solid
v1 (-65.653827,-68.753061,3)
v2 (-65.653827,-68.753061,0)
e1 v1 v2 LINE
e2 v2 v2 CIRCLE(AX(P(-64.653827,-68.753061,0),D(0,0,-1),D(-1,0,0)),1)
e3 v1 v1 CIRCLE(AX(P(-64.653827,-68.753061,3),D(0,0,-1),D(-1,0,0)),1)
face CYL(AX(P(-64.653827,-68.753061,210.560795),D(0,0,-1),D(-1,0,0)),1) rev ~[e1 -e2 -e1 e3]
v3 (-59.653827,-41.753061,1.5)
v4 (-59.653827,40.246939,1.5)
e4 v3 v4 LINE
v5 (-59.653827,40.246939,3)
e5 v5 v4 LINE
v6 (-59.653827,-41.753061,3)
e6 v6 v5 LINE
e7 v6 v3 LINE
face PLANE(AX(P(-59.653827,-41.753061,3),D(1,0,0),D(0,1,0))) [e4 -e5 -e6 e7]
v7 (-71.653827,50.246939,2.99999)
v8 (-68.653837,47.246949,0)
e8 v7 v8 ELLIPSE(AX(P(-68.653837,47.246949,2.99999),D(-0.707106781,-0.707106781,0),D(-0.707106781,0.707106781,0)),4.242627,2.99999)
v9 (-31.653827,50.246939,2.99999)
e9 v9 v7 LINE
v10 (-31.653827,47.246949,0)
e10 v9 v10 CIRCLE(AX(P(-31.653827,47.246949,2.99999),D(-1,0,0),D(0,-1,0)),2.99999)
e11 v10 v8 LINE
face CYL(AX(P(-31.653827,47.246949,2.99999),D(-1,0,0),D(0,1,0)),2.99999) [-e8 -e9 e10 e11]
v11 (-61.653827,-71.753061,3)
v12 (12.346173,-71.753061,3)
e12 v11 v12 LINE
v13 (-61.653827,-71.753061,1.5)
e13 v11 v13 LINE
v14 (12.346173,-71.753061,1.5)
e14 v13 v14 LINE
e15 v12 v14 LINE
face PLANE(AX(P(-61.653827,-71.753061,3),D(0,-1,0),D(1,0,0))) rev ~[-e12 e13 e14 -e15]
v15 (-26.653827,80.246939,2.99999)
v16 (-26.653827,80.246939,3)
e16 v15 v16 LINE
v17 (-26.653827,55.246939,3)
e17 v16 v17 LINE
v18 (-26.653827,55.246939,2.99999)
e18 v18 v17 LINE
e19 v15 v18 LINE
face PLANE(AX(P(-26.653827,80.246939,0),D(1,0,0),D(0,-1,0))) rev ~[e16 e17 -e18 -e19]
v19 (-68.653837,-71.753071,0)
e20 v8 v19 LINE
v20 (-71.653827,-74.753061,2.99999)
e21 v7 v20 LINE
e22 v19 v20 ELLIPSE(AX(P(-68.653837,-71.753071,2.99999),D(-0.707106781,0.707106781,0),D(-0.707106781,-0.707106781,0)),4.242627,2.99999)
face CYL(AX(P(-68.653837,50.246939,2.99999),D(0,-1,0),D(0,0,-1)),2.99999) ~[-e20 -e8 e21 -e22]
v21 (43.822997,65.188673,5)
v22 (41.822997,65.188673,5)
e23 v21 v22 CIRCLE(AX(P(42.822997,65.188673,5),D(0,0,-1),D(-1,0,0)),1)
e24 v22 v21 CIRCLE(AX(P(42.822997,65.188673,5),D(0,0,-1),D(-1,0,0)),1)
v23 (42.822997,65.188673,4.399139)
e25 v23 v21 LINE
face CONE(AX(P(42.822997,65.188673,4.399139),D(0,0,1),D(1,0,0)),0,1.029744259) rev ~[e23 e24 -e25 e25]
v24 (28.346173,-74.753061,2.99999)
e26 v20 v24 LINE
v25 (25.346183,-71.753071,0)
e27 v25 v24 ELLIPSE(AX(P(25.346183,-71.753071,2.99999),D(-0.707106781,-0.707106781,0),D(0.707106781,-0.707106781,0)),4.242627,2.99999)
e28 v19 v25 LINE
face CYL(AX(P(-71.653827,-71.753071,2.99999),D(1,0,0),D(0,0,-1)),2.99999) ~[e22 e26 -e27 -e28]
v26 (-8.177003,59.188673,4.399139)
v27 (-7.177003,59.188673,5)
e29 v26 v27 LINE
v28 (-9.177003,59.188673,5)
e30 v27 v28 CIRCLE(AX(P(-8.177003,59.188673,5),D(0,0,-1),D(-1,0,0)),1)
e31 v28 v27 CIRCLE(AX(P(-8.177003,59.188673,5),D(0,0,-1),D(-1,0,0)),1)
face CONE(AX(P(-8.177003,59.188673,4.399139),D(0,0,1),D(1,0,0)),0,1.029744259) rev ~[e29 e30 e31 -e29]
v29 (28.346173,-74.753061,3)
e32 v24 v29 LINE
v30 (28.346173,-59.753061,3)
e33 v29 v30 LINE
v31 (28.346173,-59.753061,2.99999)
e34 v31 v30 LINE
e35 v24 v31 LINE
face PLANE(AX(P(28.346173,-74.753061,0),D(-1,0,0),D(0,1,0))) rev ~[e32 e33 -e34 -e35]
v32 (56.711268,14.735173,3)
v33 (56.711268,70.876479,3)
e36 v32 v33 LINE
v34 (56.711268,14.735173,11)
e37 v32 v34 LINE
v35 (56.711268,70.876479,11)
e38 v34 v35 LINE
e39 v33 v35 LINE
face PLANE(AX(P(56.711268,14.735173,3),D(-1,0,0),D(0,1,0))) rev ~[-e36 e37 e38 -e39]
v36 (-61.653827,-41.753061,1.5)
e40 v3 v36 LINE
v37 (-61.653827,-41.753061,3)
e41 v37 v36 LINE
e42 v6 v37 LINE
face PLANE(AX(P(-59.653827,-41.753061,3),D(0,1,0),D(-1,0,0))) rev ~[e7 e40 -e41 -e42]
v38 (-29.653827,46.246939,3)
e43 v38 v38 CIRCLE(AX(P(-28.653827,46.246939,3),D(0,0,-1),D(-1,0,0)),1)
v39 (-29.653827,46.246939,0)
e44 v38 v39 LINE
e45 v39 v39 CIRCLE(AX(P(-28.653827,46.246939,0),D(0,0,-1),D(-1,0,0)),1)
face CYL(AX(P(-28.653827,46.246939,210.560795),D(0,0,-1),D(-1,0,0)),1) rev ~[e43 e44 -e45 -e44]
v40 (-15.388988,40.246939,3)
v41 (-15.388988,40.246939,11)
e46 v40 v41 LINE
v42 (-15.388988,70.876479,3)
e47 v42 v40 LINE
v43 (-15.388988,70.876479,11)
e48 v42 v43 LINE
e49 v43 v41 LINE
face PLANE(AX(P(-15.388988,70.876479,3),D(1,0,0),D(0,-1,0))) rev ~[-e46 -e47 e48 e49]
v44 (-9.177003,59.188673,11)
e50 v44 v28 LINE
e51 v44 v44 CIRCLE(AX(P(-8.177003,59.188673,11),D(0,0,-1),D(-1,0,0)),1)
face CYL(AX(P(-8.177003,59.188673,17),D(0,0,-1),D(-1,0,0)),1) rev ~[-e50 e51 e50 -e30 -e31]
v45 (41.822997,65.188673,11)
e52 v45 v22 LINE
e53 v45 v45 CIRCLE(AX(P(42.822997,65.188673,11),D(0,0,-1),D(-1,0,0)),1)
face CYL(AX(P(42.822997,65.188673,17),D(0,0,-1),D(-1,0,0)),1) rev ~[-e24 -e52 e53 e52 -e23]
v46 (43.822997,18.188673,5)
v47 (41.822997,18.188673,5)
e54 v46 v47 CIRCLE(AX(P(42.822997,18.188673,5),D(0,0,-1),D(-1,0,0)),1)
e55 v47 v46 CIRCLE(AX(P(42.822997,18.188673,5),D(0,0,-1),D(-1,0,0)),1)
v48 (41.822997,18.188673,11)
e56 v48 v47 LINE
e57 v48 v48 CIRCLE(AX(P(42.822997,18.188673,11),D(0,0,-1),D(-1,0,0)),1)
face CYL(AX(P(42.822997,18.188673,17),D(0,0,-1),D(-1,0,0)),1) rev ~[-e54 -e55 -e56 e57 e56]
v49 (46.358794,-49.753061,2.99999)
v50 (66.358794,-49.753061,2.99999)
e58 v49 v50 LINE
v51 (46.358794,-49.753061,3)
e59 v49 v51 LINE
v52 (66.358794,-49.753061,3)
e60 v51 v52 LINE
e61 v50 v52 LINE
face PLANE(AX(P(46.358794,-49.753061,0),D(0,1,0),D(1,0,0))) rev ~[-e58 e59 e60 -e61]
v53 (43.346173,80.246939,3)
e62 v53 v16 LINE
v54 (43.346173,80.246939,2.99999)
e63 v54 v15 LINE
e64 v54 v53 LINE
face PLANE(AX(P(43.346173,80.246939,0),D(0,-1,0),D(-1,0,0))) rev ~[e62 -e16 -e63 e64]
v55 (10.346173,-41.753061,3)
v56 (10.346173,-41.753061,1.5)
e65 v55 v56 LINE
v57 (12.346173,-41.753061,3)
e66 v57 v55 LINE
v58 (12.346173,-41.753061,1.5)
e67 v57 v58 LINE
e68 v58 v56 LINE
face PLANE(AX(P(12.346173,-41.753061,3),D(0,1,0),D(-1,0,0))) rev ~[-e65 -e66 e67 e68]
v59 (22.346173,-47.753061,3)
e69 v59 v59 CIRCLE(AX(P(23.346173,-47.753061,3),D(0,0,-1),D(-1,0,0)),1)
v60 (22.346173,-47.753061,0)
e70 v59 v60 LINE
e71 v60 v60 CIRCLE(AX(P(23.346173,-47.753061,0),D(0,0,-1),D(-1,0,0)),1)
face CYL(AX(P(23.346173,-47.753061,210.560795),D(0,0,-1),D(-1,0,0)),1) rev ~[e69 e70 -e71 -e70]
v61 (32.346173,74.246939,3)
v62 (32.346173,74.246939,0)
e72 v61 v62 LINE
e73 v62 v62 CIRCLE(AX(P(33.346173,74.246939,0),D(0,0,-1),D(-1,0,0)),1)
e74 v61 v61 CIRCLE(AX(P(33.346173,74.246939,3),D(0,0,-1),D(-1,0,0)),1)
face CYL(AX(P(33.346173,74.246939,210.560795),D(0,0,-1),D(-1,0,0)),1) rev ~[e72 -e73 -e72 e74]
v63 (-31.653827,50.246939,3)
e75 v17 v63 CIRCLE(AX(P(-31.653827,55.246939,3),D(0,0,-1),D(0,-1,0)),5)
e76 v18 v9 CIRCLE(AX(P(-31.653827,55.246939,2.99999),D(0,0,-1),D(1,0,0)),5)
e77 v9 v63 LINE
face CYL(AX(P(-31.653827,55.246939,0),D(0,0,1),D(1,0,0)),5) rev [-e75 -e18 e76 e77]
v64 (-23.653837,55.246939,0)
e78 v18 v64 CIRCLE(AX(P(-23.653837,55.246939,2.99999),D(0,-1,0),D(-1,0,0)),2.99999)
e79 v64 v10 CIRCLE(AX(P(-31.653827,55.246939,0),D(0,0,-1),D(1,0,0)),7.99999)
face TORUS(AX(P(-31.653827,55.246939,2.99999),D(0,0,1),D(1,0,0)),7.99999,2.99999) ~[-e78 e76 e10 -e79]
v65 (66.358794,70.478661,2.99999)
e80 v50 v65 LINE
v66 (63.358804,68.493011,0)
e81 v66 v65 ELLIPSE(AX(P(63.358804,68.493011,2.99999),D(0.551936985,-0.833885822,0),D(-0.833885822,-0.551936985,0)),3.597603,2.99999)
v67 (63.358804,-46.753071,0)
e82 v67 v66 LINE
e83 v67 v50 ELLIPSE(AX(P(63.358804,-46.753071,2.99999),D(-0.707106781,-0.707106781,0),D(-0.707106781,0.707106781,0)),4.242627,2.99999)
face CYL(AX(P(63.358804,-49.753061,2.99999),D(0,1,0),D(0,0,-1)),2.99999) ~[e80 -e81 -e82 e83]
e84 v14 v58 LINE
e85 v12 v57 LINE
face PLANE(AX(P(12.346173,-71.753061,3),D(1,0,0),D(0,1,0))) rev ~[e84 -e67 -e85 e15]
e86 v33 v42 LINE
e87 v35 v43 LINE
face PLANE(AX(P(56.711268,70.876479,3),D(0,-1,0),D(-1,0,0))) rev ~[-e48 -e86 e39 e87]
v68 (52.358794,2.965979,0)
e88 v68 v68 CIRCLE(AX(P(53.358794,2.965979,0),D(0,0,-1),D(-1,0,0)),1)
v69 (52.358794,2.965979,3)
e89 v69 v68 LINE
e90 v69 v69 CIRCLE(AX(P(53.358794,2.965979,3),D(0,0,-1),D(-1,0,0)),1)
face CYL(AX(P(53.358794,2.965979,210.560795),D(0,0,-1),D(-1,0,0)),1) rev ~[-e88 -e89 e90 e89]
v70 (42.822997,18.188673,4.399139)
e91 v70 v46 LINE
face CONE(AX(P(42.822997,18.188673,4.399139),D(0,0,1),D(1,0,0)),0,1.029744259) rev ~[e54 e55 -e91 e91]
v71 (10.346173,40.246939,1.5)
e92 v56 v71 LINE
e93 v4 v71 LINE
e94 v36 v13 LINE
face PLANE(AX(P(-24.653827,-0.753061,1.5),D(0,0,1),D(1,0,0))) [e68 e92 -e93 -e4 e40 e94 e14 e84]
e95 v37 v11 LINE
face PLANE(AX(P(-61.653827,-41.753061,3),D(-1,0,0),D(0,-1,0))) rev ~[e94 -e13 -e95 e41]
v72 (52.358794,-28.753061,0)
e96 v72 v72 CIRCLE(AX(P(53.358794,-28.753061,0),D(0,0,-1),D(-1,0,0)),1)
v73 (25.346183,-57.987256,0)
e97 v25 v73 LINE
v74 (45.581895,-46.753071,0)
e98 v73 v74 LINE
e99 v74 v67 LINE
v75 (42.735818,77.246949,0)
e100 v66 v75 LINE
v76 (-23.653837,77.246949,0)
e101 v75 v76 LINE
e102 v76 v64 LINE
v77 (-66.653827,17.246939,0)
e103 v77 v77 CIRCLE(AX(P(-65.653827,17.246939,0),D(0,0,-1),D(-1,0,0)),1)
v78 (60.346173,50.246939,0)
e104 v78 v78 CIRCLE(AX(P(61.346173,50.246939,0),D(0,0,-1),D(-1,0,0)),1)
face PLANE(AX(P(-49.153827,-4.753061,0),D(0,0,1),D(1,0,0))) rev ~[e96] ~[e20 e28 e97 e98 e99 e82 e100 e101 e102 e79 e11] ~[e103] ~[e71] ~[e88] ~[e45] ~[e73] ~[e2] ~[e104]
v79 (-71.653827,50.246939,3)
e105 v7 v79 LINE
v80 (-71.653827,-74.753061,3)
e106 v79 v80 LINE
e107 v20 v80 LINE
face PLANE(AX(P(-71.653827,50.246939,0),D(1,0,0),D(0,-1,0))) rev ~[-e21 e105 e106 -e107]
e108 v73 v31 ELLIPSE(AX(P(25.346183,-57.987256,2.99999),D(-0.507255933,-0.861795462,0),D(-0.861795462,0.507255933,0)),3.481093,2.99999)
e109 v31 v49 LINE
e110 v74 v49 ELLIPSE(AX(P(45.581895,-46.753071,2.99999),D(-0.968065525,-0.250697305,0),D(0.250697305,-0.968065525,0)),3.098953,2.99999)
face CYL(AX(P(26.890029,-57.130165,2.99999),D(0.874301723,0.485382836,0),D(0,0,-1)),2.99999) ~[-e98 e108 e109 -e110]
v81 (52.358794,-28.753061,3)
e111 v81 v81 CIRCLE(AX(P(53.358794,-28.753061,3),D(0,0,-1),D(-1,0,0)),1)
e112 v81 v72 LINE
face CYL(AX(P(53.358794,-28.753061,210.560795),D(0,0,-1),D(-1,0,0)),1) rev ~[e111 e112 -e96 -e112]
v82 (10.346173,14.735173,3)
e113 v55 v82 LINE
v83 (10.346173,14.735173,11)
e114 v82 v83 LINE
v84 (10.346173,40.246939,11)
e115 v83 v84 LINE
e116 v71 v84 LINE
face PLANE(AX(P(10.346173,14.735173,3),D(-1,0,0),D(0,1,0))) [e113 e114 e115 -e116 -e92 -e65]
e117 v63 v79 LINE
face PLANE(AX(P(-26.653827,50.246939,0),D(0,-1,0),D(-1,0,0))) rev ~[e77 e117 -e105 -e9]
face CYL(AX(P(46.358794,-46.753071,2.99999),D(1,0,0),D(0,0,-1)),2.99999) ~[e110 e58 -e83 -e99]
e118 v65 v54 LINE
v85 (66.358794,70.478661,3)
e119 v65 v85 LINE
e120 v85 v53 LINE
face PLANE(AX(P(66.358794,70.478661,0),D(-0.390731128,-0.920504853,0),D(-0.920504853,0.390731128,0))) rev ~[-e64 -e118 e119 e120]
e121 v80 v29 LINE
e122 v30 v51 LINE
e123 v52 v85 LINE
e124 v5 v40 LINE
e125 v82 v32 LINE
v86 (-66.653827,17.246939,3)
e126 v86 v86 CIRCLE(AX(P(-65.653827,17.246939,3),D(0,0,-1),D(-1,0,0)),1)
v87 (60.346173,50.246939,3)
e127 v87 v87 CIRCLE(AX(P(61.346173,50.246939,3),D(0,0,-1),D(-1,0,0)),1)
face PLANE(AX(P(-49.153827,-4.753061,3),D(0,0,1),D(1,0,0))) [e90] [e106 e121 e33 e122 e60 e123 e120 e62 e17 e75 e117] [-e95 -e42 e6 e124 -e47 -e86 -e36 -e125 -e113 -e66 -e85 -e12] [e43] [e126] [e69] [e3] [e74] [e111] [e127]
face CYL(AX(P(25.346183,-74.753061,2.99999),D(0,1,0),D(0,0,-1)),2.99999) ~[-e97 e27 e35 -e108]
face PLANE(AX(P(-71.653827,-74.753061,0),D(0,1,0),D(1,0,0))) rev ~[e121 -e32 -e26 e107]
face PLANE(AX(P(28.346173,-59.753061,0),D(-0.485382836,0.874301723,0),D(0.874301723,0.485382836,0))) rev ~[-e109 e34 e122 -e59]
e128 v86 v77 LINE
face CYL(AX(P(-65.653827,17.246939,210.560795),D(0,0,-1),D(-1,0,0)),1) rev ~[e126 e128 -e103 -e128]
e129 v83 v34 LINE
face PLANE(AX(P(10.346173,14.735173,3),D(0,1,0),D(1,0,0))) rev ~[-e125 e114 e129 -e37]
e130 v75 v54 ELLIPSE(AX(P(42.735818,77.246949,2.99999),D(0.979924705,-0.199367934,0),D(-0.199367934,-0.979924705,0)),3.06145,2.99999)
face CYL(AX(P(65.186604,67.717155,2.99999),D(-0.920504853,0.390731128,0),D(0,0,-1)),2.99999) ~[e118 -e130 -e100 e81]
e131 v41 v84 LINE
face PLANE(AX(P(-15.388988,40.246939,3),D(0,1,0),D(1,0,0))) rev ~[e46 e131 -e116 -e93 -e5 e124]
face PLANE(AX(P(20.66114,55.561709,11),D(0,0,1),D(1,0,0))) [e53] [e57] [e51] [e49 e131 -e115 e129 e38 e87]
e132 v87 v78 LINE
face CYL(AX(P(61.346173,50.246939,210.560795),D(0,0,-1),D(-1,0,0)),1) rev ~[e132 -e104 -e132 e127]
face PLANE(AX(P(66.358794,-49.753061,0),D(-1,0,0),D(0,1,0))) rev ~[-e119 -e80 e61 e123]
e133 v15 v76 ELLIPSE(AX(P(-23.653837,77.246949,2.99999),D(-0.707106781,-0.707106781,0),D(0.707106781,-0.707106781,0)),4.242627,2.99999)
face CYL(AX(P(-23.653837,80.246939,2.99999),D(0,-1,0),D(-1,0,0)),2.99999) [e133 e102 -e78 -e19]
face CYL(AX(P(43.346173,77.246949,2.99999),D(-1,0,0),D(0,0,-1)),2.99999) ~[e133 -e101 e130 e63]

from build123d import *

# Parameters (mm, degrees)
F0_W      = 45
F0_H      = 110
F0_H_2    = 15
F0_W_2    = 20
F0_H_3    = 100
F0_W_3    = 55
F1_DEPTH  = 3
F2_R      = 5
F3_R      = 2.99999
F5_D      = 2
F6_W      = 70
F6_H      = 82
F7_DEPTH  = 1.5
F8_W      = 46.3650951658
F8_H      = 25.5117665604
F9_DEPTH  = 8
F11_D     = 2
F11_DEPTH = 6
F11_TIP   = 0.600860619


# Not quite as in the source:
# - a fillet or chamfer is up to 0.001 mm smaller than in the source, because OpenCascade refuses the exact size


with BuildPart() as f1:
    # F0 (on Top) → F1 (new body)
    with BuildSketch(Plane.XY):
        with Locations((-49.1538274859, -4.7530609369)):
            Rectangle(F0_W, F0_H)
        Polygon((43.3461725141, 50.2469390631), (-26.6538274859, 50.2469390631), (-26.6538274859, -59.7530609369), (28.3461725141, -59.7530609369), (46.3587938504, -49.7530609369), (46.3587938504, 50.2469390631), align=None)
        with Locations((-49.1538274859, -67.2530609369)):
            Rectangle(F0_W, F0_H_2)
        with Locations((56.3587938504, 0.2469390631)):
            Rectangle(F0_W_2, F0_H_3)
        with Locations((0.8461725141, -67.2530609369)):
            Rectangle(F0_W_3, F0_H_2)
        Polygon((-26.6538274859, 80.2469390631), (-26.6538274859, 50.2469390631), (43.3461725141, 50.2469390631), (43.3461725141, 70.4786608508), (43.3461725141, 80.2469390631), align=None)
        Polygon((43.3461725141, 70.4786608508), (43.3461725141, 50.2469390631), (46.3587938504, 50.2469390631), (66.3587938504, 50.2469390631), (66.3587938504, 70.4786608508), align=None)
        Polygon((43.3461725141, 80.2469390631), (43.3461725141, 70.4786608508), (66.3587938504, 70.4786608508), align=None)
    extrude(amount=F1_DEPTH)

    # F2
    f2_edges = [f1.edges().sort_by_distance(p)[0] for p in [
        (-26.653827, 50.246939, 1.5),
    ]]
    fillet(f2_edges, radius=F2_R)

    # F3 (radius 3 in the source; OpenCascade refuses exactly that, so slightly less here)
    f3_edges = [f1.edges().sort_by_distance(p)[0] for p in [
        (-26.653827, 67.746939, 0),
        (-28.118294, 51.711405, 0),
        (8.346173, 80.246939, 0),
        (-51.653827, 50.246939, 0),
        (54.852483, 75.3628, 0),
        (-71.653827, -12.253061, 0),
        (66.358794, 10.3628, 0),
        (-21.653827, -74.753061, 0),
        (56.358794, -49.753061, 0),
        (28.346173, -67.253061, 0),
        (37.352483, -54.753061, 0),
    ]]
    fillet(f3_edges, radius=F3_R)

    # F5 (through all)
    with Locations(Plane.XY.offset(3)):
        with Locations((-65.6538274859, 17.2469390631), (-64.6538274859, -68.7530609369), (23.3461725141, -47.7530609369), (53.3587938504, -28.7530609369), (53.3587938504, 2.9659790631), (61.3461725141, 50.2469390631), (33.3461725141, 74.2469390631), (-28.6538274859, 46.2469390631)):
            Hole(F5_D / 2)

    # F6 (on face) → F7 (cut)
    with BuildSketch(Plane.XY.offset(3)):
        with Locations((-24.6538274859, -0.7530609369)):
            Rectangle(F6_W, F6_H)
        Polygon((-61.6538274859, -41.7530609369), (-61.6538274859, -71.7530609369), (12.3461725141, -71.7530609369), (12.3461725141, -41.7530609369), (10.3461725141, -41.7530609369), (-59.6538274859, -41.7530609369), align=None)
    extrude(amount=-F7_DEPTH, mode=Mode.SUBTRACT)

    # F8 (on face) → F9 (join)
    with BuildSketch(Plane.XY.offset(3)):
        Polygon((-15.3889879584, 70.8764791489), (-15.3889879584, 40.2469390631), (10.3461725141, 40.2469390631), (56.7112676799, 40.2469390631), (56.7112676799, 70.8764791489), align=None)
        with Locations((33.528720097, 27.4910557829)):
            Rectangle(F8_W, F8_H)
    extrude(amount=F9_DEPTH)

    # F11
    with Locations(Plane.XY.offset(11)):
        with Locations((-8.1770029031, 59.1886730194), (42.8229970969, 65.1886730194), (42.8229970969, 18.1886730194)):
            Hole(F11_D / 2, depth=F11_DEPTH)
            with Locations((0, 0, -(F11_DEPTH + F11_TIP / 2))):  # 118° drill point
                Cone(0, F11_D / 2, F11_TIP, mode=Mode.SUBTRACT)


solid = f1.part
